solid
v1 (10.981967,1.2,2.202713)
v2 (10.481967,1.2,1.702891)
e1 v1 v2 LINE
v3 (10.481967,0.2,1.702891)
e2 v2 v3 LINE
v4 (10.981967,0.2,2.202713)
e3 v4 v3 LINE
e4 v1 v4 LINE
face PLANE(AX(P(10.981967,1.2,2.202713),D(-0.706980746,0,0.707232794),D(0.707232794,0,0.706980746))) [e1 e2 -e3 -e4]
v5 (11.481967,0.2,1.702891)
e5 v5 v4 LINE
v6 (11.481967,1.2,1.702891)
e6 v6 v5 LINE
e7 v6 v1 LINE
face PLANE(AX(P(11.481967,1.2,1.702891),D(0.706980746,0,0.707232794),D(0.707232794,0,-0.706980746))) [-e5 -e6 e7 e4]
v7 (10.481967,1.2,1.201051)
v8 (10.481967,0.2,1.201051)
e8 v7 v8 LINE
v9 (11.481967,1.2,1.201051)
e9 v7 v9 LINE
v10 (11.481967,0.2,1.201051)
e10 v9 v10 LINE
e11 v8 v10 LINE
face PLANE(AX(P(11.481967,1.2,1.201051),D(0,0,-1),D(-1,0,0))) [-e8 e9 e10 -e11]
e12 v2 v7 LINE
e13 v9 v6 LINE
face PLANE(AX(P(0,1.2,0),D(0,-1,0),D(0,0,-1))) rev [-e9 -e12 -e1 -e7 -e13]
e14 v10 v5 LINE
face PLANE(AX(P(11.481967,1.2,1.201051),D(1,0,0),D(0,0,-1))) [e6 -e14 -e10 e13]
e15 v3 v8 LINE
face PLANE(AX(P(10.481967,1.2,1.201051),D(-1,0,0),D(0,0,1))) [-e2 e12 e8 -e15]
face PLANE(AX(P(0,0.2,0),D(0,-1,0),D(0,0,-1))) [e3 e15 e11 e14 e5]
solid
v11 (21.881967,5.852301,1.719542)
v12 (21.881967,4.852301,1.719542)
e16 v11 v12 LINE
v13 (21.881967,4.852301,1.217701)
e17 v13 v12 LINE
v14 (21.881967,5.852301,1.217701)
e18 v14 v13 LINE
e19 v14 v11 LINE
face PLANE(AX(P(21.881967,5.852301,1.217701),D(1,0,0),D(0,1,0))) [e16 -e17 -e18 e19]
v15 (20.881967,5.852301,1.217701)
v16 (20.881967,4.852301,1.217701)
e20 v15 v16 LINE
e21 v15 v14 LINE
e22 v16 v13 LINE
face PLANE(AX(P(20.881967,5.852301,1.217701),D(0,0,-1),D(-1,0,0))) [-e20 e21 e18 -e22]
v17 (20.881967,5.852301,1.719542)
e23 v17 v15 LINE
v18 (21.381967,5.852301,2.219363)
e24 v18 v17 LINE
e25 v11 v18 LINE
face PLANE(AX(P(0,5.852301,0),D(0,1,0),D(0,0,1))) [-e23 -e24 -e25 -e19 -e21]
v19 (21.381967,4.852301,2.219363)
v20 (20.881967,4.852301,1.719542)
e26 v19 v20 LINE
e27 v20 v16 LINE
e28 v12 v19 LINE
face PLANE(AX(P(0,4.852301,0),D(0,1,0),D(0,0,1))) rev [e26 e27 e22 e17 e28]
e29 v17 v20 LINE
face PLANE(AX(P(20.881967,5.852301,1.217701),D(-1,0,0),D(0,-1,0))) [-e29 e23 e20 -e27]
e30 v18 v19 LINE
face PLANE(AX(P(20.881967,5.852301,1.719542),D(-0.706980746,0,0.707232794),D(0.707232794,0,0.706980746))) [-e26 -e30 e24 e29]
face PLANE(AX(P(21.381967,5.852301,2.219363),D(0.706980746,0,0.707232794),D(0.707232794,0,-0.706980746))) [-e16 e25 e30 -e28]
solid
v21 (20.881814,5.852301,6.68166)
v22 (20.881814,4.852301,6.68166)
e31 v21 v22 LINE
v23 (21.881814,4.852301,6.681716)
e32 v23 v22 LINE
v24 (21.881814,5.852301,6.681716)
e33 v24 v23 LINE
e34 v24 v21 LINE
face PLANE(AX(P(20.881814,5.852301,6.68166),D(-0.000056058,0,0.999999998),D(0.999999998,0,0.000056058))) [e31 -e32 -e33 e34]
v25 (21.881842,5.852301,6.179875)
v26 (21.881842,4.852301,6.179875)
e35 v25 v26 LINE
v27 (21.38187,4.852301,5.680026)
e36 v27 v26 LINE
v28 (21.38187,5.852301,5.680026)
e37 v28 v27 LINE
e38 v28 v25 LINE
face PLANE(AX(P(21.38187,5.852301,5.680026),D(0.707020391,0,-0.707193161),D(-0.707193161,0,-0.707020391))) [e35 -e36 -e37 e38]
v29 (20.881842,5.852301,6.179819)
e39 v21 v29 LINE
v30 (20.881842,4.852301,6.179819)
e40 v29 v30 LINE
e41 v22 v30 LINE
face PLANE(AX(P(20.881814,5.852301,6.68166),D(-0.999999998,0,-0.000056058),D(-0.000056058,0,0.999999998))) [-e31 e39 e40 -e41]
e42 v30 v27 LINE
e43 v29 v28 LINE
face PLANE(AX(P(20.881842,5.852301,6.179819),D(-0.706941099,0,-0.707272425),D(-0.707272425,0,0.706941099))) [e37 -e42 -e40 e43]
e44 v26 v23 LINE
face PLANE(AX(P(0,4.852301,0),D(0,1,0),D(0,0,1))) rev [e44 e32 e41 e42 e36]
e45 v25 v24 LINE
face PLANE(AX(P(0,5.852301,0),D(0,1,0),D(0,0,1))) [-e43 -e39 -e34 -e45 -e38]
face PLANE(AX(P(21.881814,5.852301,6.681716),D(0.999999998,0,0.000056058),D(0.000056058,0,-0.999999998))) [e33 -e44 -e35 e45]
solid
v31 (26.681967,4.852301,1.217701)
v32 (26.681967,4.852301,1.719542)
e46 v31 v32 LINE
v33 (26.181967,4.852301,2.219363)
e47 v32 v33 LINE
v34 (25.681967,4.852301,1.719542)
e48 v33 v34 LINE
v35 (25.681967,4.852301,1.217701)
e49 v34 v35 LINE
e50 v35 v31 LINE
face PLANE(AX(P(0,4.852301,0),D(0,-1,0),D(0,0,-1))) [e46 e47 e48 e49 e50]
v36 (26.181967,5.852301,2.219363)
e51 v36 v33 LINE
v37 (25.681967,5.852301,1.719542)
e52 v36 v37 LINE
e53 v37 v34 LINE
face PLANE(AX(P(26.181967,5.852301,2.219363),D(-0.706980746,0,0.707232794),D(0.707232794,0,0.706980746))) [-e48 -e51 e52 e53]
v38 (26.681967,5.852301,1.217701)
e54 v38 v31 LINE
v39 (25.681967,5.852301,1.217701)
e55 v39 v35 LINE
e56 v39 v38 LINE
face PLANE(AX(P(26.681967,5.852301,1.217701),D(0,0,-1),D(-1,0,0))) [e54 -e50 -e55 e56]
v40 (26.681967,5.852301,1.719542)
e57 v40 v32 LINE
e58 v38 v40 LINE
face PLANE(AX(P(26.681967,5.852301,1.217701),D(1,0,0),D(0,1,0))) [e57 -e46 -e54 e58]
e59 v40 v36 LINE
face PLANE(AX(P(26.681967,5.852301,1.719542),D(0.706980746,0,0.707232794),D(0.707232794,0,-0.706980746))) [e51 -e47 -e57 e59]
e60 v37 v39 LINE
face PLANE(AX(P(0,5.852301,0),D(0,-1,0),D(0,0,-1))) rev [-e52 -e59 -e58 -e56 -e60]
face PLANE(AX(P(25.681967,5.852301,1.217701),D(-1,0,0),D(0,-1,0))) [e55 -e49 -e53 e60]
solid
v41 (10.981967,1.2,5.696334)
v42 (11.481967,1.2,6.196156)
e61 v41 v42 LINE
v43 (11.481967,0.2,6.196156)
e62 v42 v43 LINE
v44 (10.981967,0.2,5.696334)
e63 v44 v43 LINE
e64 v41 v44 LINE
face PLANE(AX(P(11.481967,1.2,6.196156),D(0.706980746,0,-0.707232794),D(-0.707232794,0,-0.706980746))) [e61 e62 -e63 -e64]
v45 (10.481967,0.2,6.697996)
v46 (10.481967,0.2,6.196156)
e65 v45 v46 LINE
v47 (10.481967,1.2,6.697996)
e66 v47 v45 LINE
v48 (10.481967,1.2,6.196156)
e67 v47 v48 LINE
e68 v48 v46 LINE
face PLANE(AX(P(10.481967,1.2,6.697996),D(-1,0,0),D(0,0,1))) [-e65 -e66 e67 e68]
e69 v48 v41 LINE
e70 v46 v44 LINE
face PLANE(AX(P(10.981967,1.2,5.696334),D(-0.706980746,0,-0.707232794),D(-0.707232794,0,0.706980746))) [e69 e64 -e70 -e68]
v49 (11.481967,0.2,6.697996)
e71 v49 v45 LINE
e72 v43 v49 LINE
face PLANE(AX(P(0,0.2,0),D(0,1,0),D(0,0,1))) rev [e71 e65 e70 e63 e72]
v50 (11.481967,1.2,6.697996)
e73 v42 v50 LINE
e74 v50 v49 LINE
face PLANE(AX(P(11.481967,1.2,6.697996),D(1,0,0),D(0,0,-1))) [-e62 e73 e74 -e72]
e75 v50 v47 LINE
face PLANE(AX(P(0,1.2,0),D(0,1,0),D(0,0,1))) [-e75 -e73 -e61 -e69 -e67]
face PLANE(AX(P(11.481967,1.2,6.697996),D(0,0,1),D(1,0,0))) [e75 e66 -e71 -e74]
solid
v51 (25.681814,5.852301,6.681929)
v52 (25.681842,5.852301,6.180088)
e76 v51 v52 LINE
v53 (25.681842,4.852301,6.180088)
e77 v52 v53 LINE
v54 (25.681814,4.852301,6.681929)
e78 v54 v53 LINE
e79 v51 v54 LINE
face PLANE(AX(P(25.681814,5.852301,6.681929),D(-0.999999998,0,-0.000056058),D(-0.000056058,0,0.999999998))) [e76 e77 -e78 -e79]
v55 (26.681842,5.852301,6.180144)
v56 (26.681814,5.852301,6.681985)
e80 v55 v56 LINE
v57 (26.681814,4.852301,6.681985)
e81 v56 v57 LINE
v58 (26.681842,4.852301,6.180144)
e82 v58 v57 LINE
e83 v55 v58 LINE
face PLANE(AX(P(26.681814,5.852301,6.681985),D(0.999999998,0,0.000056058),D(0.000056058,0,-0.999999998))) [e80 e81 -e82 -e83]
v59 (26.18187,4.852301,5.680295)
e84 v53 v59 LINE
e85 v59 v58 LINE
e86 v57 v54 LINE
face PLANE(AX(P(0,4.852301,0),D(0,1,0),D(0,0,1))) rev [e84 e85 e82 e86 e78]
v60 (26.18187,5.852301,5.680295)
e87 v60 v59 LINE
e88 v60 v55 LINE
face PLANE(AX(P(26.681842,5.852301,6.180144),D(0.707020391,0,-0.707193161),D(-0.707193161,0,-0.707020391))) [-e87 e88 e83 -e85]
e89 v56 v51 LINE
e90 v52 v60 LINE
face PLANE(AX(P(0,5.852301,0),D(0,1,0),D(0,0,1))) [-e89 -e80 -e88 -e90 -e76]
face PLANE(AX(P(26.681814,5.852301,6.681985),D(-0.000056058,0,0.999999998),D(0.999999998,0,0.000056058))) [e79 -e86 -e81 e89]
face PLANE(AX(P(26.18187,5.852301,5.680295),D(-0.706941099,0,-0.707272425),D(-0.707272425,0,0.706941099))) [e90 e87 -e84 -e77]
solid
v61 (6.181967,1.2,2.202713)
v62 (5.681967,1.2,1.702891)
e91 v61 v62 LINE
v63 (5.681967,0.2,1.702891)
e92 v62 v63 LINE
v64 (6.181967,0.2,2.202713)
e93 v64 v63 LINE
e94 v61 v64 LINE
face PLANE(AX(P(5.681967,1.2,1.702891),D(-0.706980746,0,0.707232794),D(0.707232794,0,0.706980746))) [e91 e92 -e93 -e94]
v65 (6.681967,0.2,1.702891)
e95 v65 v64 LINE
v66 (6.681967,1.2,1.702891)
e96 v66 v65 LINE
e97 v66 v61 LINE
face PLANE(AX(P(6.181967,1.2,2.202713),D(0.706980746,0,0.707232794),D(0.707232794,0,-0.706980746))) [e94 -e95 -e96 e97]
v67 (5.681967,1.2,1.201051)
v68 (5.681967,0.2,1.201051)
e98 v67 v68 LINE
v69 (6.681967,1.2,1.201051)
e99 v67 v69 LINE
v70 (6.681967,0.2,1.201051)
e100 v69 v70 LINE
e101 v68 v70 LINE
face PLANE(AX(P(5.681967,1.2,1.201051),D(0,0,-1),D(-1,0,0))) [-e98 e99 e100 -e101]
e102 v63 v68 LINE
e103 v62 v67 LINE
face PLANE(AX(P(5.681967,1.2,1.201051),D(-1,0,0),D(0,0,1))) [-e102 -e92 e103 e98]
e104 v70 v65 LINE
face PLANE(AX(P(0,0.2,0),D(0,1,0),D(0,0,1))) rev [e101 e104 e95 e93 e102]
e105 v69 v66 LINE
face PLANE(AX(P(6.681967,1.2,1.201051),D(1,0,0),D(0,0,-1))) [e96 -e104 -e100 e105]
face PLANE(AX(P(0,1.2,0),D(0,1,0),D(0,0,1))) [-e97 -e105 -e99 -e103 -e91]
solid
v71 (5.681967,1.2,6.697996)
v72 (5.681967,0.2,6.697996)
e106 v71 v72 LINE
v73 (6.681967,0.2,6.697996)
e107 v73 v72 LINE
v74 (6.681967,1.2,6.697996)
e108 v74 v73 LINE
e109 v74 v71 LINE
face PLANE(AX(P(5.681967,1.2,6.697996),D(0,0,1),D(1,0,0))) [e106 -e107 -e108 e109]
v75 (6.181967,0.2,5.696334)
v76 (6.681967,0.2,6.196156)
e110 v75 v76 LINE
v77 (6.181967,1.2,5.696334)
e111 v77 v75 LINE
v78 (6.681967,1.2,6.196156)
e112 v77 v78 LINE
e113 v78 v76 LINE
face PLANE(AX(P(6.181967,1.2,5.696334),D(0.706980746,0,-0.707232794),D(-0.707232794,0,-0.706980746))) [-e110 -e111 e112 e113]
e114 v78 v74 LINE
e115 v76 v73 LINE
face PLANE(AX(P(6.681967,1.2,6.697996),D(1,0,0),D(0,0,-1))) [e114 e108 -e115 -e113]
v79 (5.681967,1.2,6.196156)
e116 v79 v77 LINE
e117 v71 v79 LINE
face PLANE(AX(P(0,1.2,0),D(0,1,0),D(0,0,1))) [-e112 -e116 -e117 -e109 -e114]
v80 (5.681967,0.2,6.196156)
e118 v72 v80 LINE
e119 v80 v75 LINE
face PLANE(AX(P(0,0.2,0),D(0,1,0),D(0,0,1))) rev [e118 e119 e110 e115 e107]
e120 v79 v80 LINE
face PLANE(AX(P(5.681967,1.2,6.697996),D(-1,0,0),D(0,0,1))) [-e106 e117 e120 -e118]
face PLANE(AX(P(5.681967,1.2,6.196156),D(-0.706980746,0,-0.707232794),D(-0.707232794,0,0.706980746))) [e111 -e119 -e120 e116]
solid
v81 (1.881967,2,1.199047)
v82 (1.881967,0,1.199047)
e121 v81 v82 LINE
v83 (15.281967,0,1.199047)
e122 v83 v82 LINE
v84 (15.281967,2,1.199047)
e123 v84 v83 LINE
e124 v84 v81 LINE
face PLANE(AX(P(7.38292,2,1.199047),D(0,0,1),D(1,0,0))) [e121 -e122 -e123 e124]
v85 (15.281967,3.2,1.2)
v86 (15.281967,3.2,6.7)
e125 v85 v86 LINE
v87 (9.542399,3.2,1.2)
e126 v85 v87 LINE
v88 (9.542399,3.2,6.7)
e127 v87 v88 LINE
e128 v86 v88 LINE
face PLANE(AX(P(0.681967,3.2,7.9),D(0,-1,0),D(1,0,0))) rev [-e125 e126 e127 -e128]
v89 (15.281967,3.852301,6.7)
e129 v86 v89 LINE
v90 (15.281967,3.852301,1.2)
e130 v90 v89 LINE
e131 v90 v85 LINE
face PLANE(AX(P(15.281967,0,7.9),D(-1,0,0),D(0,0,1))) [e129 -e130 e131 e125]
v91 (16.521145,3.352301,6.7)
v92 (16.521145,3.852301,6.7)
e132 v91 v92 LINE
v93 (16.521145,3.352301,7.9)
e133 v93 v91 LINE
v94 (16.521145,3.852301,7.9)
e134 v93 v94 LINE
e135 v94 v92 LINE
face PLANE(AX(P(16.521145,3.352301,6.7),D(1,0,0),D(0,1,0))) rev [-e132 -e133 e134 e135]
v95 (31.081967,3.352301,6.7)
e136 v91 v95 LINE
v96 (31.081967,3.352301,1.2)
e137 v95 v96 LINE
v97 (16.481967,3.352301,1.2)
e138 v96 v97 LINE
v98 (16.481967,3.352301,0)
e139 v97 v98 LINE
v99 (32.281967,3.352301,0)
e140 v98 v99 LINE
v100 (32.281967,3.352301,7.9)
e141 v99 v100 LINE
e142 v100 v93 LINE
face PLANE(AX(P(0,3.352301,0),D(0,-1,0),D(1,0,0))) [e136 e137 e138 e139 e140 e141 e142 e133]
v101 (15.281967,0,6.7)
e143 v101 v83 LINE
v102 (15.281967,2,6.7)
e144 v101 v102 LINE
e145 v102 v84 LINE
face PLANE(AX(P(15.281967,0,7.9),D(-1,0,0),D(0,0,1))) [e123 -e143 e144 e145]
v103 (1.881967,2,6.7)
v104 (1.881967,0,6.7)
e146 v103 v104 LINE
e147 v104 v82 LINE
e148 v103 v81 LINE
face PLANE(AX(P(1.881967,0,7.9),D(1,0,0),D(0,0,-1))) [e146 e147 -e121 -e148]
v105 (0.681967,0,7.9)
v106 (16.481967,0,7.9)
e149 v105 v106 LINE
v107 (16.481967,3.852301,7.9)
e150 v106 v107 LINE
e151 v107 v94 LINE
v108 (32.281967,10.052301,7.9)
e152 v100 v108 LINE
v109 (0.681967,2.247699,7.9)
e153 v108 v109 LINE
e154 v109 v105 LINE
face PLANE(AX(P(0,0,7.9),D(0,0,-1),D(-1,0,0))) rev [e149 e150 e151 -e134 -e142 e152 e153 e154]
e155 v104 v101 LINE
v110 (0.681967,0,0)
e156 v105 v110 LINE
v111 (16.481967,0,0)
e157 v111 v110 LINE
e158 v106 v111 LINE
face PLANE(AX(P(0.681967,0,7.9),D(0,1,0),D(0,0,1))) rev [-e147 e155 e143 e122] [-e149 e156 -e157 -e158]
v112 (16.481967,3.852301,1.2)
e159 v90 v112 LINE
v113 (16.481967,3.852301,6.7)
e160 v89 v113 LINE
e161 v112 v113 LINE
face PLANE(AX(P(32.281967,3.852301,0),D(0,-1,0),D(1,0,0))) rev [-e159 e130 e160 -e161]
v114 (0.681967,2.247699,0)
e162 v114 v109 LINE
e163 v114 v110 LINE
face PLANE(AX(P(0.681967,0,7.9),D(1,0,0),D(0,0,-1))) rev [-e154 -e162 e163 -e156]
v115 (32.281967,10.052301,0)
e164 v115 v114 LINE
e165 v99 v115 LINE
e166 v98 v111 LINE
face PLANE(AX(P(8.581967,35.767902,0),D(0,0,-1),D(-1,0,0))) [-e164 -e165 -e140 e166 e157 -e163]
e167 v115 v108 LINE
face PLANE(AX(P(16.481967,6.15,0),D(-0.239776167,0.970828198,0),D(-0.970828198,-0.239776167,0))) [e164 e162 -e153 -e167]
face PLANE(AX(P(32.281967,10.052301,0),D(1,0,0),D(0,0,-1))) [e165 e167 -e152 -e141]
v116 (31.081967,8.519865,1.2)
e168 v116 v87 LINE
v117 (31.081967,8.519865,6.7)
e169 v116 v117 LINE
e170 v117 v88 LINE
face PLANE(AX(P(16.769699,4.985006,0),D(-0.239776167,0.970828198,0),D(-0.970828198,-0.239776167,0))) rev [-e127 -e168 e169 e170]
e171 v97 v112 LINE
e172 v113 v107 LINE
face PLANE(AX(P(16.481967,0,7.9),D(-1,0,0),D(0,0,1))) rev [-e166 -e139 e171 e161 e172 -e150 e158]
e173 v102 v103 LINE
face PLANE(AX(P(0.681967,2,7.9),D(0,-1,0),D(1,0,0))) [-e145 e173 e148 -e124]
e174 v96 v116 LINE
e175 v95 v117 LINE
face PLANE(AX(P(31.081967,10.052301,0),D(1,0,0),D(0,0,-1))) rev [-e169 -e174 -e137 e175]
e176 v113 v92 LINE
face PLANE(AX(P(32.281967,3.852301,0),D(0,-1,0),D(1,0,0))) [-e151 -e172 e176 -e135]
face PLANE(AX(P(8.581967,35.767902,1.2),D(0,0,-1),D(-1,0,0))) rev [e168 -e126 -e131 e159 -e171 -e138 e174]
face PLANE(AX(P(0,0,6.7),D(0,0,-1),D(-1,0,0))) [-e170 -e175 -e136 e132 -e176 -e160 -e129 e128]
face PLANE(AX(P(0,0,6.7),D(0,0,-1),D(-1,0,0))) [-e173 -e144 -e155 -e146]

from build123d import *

# Parameters (mm, degrees)
MAINBASESKETCH_W          = 15.8
MAINBASESKETCH_H          = 3.2
MAINBASEEXTRUDE_DEPTH     = 7.9
STUDSSKETCH_R             = 2.4
STUDSEXTRUDE_DEPTH        = 1.6
MAINBASESHELL_T           = -1.2
LCUTBLUE_DEPTH            = 19.555463972
LCUTBLUE_DEPTH_BACK       = 19.555463972
CUTADDEDTOLCUT_DEPTH      = 2
MADESLIMCUTSKETCH_W       = 7.9
MADESLIMCUTSKETCH_H       = 7.9
MADESLIMCUT_DEPTH         = 19.897228453
ANGLEDSLIMBASECUT_DEPTH   = 19.555463972
ANGLEDSLIMBASESWEEP_DEPTH = 7.9
SKETCH147_W               = 5.500952983
SKETCH147_H               = 1.199047018
SWEEP27_DEPTH             = 7.9
SHELL9_START              = 1.2
SHELL9_DEPTH              = 5.5
BOSS_EXTRUDE21_START      = -0.2
BOSS_EXTRUDE21_DEPTH      = 1
BOSS_EXTRUDE21_2_DEPTH    = 1
BOSS_EXTRUDE21_3_DEPTH    = 1
BOSS_EXTRUDE21_4_DEPTH    = 1
BOSS_EXTRUDE22_START      = -1
BOSS_EXTRUDE22_DEPTH      = 1
BOSS_EXTRUDE22_2_DEPTH    = 1
BOSS_EXTRUDE22_3_DEPTH    = 1
BOSS_EXTRUDE22_4_DEPTH    = 1
BOSS_EXTRUDE24_DEPTH      = 0.5


# Read off the part's stored shape, not the designer's step: AngledSlimBaseSweep, Sweep27, Shell9
with BuildPart() as part:
    # MainBaseSketch → MainBaseExtrude (new, symmetric)
    with BuildSketch(Plane.XY):
        with Locations((8.581967213, 1.6)):
            Rectangle(MAINBASESKETCH_W, MAINBASESKETCH_H)
    extrude(amount=MAINBASEEXTRUDE_DEPTH, both=True)

    # StudsSketch → StudsExtrude (add)
    with BuildSketch(Plane(origin=(0, 3.2, 0), x_dir=(1, 0, 0), z_dir=(0, 1, 0))):
        with Locations((4.581967213, 4)):
            Circle(STUDSSKETCH_R)
    extrude(amount=STUDSEXTRUDE_DEPTH)

    # MainBaseShell
    mainbaseshell_openings = [part.faces().sort_by_distance(p)[0] for p in [
        (8.581967213, 0, 0),
    ]]
    offset(amount=MAINBASESHELL_T, openings=mainbaseshell_openings, kind=Kind.INTERSECTION)

    # LCUTBlueSketch → LCutBlue (cut, two sides: drawn at the far end of the back side and taken through both)
    with BuildSketch(Plane(origin=(0, 3.2, 0), x_dir=(1, 0, 0), z_dir=(0, 1, 0)).offset(-LCUTBLUE_DEPTH_BACK)):
        Polygon((8.581967213, 53.229874044), (8.581967213, 7.9), (8.581967213, 0), (16.481967213, 0), (61.811841258, 0), (125.917963912, 64.106122654), (72.688089868, 117.335996699), align=None)
    extrude(amount=LCUTBLUE_DEPTH + LCUTBLUE_DEPTH_BACK, mode=Mode.SUBTRACT)

    # CutAddedtoLSketch → CutAddedToLCut (add)
    with BuildSketch(Plane.XZ):
        Polygon((7.382920196, -6.7), (8.581967213, -6.7), (8.581967213, 0), (15.281967213, 0), (15.281967213, 1.199047018), (7.382920196, 1.199047018), (7.382920196, 0), align=None)
    extrude(amount=-CUTADDEDTOLCUT_DEPTH)

    # MadeSlimCutSketch → MadeSlimCut (cut, through all)
    with BuildSketch(Plane.XZ):
        with Locations((4.631967213, -3.95)):
            Rectangle(MADESLIMCUTSKETCH_W, MADESLIMCUTSKETCH_H)
    extrude(amount=-MADESLIMCUT_DEPTH, mode=Mode.SUBTRACT)

    # AngledSlimBaseSketch → AngledSlimBaseCut (cut, through all)
    with BuildSketch(Plane.XY.offset(7.9)):
        Polygon((16.481967213, 6.15), (0.681967213, 2.247699421), (16.481967213, 2.247699421), align=None)
    extrude(amount=-ANGLEDSLIMBASECUT_DEPTH, mode=Mode.SUBTRACT)


with BuildPart() as body_2:
    # of the pieces the cut leaves, the one that is kept (angledslimbasecut_keep)
    add(part.part.solids().sort_by_distance((0.681967213, 0, 7.9))[0])

    # AngledSlimBaseSweep outline → AngledSlimBaseSweep (add)
    with BuildSketch(Plane.XY):
        Polygon((16.481967213, 2.247699421), (16.481967213, 6.15), (0.681967213, 2.247699421), align=None)
    extrude(amount=ANGLEDSLIMBASESWEEP_DEPTH)

    # Sweep25: sweep along a curve in space
    with BuildLine() as sweep25_path:
        Line((7.382920196, 2, 1.199047018), (7.382920196, 0, 1.199047018))
    # Sketch147 → Sweep25 (sweep)
    with BuildSketch(Plane(origin=(0, 0, 0), x_dir=(-1, 0, 0), z_dir=(0, -1, 0))):
        with Locations((-4.632443704, -0.599523509)):
            Rectangle(SKETCH147_W, SKETCH147_H)
    sweep(path=sweep25_path.line)

    # Sweep27 outline → Sweep27 (add)
    with BuildSketch(Plane.XY):
        Polygon((32.281967213, 3.852300579), (32.281967213, 10.052300579), (16.481967213, 6.15), (16.481967213, 3.852300579), align=None)
    extrude(amount=SWEEP27_DEPTH)

    # Shell9 outline → Shell9 (cut)
    with BuildSketch(Plane.XY.offset(SHELL9_START)):
        Polygon((15.281967213, 3.2), (15.281967213, 3.852300579), (31.081967213, 3.852300579), (31.081967213, 8.51986528), (9.542398513, 3.2), align=None)
    extrude(amount=SHELL9_DEPTH, mode=Mode.SUBTRACT)

    # Sketch165 → Boss-Extrude24 (add)
    with BuildSketch(Plane(origin=(0, 3.852300579, 0), x_dir=(-1, 0, 0), z_dir=(0, -1, 0))):
        Polygon((-16.481967213, -1.2), (-16.481967213, 0), (-32.281967213, 0), (-32.281967213, -7.9), (-16.52114508, -7.9), (-16.52114508, -6.7), (-31.081967213, -6.7), (-31.081967213, -1.2), align=None)
    extrude(amount=BOSS_EXTRUDE24_DEPTH)


with BuildPart() as body_2_2:
    # Sketch163 → Boss-Extrude21 (new body)
    with BuildSketch(Plane(origin=(0, 0, 0), x_dir=(-1, 0, 0), z_dir=(0, -1, 0)).offset(BOSS_EXTRUDE21_START)):
        Polygon((-11.481967213, -1.201050686), (-11.481967213, -1.702890901), (-10.981967213, -2.202712708), (-10.481967213, -1.702890901), (-10.481967213, -1.201050686), align=None)
    extrude(amount=-BOSS_EXTRUDE21_DEPTH)


with BuildPart() as body_3:
    # Sketch163 → Boss-Extrude21 2 (new body)
    with BuildSketch(Plane(origin=(0, 0, 0), x_dir=(-1, 0, 0), z_dir=(0, -1, 0)).offset(BOSS_EXTRUDE21_START)):
        Polygon((-5.681967213, -1.702890901), (-6.181967213, -2.202712708), (-6.681967213, -1.702890901), (-6.681967213, -1.201050686), (-5.681967213, -1.201050686), align=None)
    extrude(amount=-BOSS_EXTRUDE21_2_DEPTH)


with BuildPart() as body_4:
    # Sketch163 → Boss-Extrude21 3 (new body)
    with BuildSketch(Plane(origin=(0, 0, 0), x_dir=(-1, 0, 0), z_dir=(0, -1, 0)).offset(BOSS_EXTRUDE21_START)):
        Polygon((-5.681967213, -6.697996332), (-5.681967213, -6.196156117), (-6.181967213, -5.69633431), (-6.681967213, -6.196156117), (-6.681967213, -6.697996332), align=None)
    extrude(amount=-BOSS_EXTRUDE21_3_DEPTH)


with BuildPart() as body_5:
    # Sketch163 → Boss-Extrude21 4 (new body)
    with BuildSketch(Plane(origin=(0, 0, 0), x_dir=(-1, 0, 0), z_dir=(0, -1, 0)).offset(BOSS_EXTRUDE21_START)):
        Polygon((-11.481967213, -6.697996332), (-10.481967213, -6.697996332), (-10.481967213, -6.196156117), (-10.981967213, -5.69633431), (-11.481967213, -6.196156117), align=None)
    extrude(amount=-BOSS_EXTRUDE21_4_DEPTH)


with BuildPart() as body_6:
    # Sketch164 → Boss-Extrude22 (new body)
    with BuildSketch(Plane(origin=(0, 3.852300579, 0), x_dir=(-1, 0, 0), z_dir=(0, -1, 0)).offset(BOSS_EXTRUDE22_START)):
        Polygon((-26.681967213, -1.21770137), (-26.681967213, -1.719541586), (-26.181967213, -2.219363392), (-25.681967213, -1.719541586), (-25.681967213, -1.21770137), align=None)
    extrude(amount=-BOSS_EXTRUDE22_DEPTH)


with BuildPart() as body_7:
    # Sketch164 → Boss-Extrude22 2 (new body)
    with BuildSketch(Plane(origin=(0, 3.852300579, 0), x_dir=(-1, 0, 0), z_dir=(0, -1, 0)).offset(BOSS_EXTRUDE22_START)):
        Polygon((-20.881967213, -1.719541586), (-21.381967213, -2.219363392), (-21.881967213, -1.719541586), (-21.881967213, -1.21770137), (-20.881967213, -1.21770137), align=None)
    extrude(amount=-BOSS_EXTRUDE22_2_DEPTH)


with BuildPart() as body_8:
    # Sketch164 → Boss-Extrude22 3 (new body)
    with BuildSketch(Plane(origin=(0, 3.852300579, 0), x_dir=(-1, 0, 0), z_dir=(0, -1, 0)).offset(BOSS_EXTRUDE22_START)):
        Polygon((-20.881814064, -6.681659566), (-20.881842196, -6.179819352), (-21.381870215, -5.680025575), (-21.881842195, -6.17987541), (-21.881814063, -6.681715624), align=None)
    extrude(amount=-BOSS_EXTRUDE22_3_DEPTH)


with BuildPart() as body_9:
    # Sketch164 → Boss-Extrude22 4 (new body)
    with BuildSketch(Plane(origin=(0, 3.852300579, 0), x_dir=(-1, 0, 0), z_dir=(0, -1, 0)).offset(BOSS_EXTRUDE22_START)):
        Polygon((-26.681814055, -6.681984702), (-25.681814057, -6.681928644), (-25.681842189, -6.180088429), (-26.181870207, -5.680294652), (-26.681842187, -6.180144487), align=None)
    extrude(amount=-BOSS_EXTRUDE22_4_DEPTH)


solid = Compound([body_2.part, body_2_2.part, body_3.part, body_4.part, body_5.part, body_6.part, body_7.part, body_8.part, body_9.part])
